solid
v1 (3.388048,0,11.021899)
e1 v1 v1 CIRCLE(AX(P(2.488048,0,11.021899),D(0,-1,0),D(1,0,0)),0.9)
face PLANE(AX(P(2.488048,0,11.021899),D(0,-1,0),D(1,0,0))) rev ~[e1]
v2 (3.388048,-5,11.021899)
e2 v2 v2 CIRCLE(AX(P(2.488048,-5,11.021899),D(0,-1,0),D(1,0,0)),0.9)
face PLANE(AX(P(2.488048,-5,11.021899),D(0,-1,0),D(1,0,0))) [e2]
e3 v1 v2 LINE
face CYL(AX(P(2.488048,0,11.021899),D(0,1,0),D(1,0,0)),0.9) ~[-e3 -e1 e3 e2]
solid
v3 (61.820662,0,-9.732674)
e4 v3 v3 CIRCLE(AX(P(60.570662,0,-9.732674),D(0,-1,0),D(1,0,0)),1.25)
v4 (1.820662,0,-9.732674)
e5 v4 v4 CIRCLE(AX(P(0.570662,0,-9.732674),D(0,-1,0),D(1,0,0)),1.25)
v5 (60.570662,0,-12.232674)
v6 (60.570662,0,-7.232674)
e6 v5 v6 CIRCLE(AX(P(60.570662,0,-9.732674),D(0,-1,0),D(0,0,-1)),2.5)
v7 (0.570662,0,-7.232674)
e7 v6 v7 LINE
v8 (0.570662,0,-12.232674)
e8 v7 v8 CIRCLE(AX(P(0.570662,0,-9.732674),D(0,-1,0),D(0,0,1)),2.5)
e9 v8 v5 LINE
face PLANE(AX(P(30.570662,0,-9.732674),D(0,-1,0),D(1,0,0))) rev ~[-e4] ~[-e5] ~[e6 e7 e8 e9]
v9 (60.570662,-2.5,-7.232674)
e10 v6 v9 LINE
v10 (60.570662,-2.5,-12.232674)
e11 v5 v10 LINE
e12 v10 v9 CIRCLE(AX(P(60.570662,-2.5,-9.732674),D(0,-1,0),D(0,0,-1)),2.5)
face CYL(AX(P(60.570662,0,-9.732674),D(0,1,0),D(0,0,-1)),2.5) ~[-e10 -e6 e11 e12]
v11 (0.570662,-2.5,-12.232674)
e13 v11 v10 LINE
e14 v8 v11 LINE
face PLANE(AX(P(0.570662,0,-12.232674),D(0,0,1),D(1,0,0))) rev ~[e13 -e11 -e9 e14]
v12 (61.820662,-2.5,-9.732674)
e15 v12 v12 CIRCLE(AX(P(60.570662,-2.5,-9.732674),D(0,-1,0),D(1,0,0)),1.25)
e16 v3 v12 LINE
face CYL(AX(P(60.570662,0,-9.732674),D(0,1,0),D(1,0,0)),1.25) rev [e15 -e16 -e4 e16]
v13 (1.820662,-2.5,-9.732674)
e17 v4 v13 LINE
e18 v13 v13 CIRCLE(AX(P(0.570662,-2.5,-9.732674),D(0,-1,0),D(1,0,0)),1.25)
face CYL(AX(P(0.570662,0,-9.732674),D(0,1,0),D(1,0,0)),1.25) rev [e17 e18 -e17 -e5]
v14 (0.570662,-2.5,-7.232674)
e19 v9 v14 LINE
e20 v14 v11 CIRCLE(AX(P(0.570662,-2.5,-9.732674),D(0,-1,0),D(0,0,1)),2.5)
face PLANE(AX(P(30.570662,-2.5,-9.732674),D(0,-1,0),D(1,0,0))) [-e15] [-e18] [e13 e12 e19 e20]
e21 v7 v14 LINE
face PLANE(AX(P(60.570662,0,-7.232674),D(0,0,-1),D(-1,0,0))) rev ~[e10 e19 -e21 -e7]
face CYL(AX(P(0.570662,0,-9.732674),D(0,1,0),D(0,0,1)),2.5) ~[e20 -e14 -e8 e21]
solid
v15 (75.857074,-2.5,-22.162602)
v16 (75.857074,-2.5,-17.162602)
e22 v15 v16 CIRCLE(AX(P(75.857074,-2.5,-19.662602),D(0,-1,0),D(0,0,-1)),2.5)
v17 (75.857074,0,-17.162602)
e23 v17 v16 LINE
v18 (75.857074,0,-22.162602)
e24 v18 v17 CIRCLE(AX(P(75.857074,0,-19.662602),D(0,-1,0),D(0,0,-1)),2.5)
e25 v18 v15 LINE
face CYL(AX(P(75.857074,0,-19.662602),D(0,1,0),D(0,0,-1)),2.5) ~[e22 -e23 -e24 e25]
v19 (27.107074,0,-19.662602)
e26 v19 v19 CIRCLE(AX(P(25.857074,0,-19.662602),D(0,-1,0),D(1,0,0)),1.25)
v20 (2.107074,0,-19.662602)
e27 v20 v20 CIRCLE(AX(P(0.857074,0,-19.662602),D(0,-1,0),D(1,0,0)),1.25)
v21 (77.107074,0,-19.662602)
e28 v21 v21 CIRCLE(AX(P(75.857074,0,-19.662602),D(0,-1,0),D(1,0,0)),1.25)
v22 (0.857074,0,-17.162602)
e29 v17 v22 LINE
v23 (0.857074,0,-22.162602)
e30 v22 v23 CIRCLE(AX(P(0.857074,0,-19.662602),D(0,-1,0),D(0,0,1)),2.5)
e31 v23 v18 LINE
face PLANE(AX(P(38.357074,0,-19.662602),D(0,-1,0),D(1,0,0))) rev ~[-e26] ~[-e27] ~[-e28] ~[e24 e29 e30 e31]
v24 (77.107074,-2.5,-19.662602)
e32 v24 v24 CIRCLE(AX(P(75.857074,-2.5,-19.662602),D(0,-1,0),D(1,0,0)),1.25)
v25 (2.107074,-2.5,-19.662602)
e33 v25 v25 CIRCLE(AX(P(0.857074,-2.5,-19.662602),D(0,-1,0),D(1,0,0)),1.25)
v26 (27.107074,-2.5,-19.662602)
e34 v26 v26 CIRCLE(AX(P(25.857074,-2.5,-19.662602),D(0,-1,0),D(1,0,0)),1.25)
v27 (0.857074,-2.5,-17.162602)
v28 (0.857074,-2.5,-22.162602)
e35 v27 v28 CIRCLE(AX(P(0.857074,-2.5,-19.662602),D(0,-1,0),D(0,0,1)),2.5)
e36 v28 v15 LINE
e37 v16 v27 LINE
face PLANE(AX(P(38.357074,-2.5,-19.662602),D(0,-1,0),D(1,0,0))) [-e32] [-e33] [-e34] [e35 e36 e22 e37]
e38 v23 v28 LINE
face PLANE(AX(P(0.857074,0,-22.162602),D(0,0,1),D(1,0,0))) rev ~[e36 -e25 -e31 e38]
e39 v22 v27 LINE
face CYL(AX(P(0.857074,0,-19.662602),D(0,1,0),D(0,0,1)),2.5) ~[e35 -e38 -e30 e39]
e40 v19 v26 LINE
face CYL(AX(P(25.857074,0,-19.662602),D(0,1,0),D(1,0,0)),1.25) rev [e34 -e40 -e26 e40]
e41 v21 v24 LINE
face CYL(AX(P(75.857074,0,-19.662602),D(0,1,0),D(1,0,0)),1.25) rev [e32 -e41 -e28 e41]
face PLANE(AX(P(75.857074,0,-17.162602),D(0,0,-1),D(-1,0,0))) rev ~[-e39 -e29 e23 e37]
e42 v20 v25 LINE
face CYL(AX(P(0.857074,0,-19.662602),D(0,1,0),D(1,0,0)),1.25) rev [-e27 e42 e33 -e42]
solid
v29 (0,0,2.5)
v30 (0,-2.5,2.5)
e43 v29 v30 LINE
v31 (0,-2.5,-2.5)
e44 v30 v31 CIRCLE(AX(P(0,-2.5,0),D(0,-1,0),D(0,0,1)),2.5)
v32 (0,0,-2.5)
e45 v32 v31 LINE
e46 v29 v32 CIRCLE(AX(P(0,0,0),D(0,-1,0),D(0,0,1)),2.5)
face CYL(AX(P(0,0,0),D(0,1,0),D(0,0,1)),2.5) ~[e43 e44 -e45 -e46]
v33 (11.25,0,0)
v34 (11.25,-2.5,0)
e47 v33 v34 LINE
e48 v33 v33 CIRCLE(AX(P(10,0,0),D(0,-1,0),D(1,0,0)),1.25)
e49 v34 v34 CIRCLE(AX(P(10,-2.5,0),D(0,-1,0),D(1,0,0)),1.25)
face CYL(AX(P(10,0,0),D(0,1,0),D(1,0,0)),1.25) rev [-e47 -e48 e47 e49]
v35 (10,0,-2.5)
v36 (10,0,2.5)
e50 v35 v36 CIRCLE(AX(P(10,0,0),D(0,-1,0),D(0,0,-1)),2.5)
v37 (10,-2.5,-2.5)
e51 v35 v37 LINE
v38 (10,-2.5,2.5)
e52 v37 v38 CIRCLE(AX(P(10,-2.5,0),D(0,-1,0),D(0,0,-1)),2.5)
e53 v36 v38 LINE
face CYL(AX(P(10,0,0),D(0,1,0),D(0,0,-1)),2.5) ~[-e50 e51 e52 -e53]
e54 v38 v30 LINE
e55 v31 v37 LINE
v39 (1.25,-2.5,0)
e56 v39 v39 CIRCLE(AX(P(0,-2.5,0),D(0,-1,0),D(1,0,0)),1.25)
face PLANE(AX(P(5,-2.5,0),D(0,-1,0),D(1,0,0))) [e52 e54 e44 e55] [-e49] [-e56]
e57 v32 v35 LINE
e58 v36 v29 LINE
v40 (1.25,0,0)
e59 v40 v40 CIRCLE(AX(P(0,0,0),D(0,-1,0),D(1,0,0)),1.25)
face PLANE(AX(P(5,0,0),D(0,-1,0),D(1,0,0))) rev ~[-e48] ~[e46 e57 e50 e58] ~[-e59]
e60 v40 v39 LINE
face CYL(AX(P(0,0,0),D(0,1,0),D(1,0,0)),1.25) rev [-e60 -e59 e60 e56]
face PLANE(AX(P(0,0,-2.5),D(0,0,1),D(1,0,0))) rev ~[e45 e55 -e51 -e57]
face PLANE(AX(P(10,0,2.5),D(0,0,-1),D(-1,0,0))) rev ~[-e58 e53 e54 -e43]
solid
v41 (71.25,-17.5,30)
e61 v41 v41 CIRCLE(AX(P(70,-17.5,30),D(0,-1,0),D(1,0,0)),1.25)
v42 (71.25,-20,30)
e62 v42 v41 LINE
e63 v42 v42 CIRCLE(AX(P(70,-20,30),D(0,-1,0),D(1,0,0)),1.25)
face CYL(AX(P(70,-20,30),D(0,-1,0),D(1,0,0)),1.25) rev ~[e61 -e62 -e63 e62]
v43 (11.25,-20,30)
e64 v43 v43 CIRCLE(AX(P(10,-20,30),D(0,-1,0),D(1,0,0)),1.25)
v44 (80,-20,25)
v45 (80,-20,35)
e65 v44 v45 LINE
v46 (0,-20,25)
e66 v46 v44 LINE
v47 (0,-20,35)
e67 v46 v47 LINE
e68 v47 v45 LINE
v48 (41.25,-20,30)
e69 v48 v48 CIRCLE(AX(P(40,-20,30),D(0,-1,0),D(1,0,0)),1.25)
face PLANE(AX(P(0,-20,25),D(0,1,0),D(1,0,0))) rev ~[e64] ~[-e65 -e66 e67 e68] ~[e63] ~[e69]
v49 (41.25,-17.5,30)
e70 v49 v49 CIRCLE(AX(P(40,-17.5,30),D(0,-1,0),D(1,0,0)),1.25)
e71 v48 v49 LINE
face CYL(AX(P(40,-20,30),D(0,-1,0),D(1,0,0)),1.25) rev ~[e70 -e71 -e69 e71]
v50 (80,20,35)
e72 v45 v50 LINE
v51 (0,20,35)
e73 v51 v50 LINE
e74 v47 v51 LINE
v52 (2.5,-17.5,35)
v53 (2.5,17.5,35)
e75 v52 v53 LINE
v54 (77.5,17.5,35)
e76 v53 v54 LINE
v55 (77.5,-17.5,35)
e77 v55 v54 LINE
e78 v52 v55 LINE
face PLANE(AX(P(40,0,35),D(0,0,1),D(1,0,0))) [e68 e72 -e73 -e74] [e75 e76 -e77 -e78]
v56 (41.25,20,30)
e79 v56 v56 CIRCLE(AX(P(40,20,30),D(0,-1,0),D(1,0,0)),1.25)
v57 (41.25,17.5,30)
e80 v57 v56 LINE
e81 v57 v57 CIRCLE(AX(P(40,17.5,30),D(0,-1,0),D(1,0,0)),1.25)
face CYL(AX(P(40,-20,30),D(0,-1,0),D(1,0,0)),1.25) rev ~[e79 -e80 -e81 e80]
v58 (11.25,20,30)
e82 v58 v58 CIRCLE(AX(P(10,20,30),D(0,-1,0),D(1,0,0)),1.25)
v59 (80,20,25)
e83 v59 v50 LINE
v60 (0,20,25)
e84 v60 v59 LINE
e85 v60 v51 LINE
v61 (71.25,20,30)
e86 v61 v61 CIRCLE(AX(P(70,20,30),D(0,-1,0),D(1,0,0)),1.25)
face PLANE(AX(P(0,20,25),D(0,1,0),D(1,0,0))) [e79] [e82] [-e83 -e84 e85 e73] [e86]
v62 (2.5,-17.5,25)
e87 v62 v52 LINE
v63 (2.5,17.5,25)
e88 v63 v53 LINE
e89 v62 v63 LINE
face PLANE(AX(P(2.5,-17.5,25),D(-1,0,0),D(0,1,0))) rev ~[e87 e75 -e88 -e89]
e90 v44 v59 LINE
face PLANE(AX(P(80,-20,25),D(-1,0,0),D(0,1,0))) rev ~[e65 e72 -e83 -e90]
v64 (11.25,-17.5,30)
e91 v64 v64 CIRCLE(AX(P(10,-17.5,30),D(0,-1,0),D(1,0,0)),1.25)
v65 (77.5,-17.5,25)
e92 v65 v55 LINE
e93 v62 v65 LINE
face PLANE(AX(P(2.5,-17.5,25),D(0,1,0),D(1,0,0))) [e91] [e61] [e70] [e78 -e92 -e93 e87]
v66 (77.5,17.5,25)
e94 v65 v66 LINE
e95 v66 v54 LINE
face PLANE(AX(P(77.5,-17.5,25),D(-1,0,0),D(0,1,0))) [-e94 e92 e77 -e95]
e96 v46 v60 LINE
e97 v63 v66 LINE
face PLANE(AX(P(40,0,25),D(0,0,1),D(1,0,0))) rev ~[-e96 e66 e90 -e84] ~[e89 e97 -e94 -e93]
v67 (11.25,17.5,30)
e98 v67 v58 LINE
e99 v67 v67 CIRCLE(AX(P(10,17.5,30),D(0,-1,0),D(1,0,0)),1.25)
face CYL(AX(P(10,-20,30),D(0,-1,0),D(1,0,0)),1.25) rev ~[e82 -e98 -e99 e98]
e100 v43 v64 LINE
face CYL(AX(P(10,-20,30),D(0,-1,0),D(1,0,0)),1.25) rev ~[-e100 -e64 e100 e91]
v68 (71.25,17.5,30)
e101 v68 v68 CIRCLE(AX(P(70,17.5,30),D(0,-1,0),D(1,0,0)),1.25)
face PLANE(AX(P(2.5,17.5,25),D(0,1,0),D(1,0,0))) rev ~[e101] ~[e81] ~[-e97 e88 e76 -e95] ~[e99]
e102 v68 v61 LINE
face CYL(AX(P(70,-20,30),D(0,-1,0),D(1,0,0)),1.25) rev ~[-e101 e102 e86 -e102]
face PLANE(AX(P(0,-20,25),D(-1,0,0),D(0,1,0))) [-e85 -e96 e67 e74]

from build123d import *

# Parameters (mm, degrees)
F1_R      = 1.25
F2_DEPTH  = 2.5
F3_R      = 1.25
F4_DEPTH  = 2.5
F5_R      = 1.25
F6_DEPTH  = 2.5
F8_W      = 80
F8_H      = 40
F8_W_2    = 75
F8_H_2    = 35
F9_DEPTH  = 10
F10_R     = 1.25
F11_DEPTH = 40.001
F12_R     = 0.9
F13_DEPTH = 5


with BuildPart() as f2:
    # F1 (on Front) → F2 (new body)
    with BuildSketch(Plane.XZ):
        with BuildLine():
            Line((10, 2.5), (0, 2.5))
            ThreePointArc((0, 2.5), (-2.5, 0), (0, -2.5))
            Line((0, -2.5), (10, -2.5))
            ThreePointArc((10, -2.5), (12.5, 0), (10, 2.5))
        make_face()
        Circle(F1_R, mode=Mode.SUBTRACT)
        with Locations((10, 0)):
            Circle(F1_R, mode=Mode.SUBTRACT)
    extrude(amount=F2_DEPTH)


with BuildPart() as f4:
    # F3 (on Front) → F4 (new body)
    with BuildSketch(Plane.XZ):
        with BuildLine():
            Line((60.5706622079, -7.232673876), (0.5706622079, -7.232673876))
            ThreePointArc((0.5706622079, -7.232673876), (-1.9293377921, -9.732673876), (0.5706622079, -12.232673876))
            Line((0.5706622079, -12.232673876), (60.5706622079, -12.232673876))
            ThreePointArc((60.5706622079, -12.232673876), (63.0706622079, -9.732673876), (60.5706622079, -7.232673876))
        make_face()
        with Locations((0.5706622079, -9.732673876)):
            Circle(F3_R, mode=Mode.SUBTRACT)
        with Locations((60.5706622079, -9.732673876)):
            Circle(F3_R, mode=Mode.SUBTRACT)
    extrude(amount=F4_DEPTH)


with BuildPart() as f6:
    # F5 (on Front) → F6 (new body)
    with BuildSketch(Plane.XZ):
        with BuildLine():
            Line((75.8570737601, -17.1626018733), (0.8570737601, -17.1626018733))
            ThreePointArc((0.8570737601, -17.1626018733), (-1.6429262399, -19.6626018733), (0.8570737601, -22.1626018733))
            Line((0.8570737601, -22.1626018733), (75.8570737601, -22.1626018733))
            ThreePointArc((75.8570737601, -22.1626018733), (78.3570737601, -19.6626018733), (75.8570737601, -17.1626018733))
        make_face()
        with Locations((0.8570737601, -19.6626018733)):
            Circle(F5_R, mode=Mode.SUBTRACT)
        with Locations((25.8570737601, -19.6626018733)):
            Circle(F5_R, mode=Mode.SUBTRACT)
        with Locations((75.8570737601, -19.6626018733)):
            Circle(F5_R, mode=Mode.SUBTRACT)
    extrude(amount=F6_DEPTH)


with BuildPart() as f9:
    # F8 (on offset) → F9 (new body)
    with BuildSketch(Plane.XY.offset(25)):
        with Locations((40, 0)):
            Rectangle(F8_W, F8_H)
        with Locations((40, 0)):
            Rectangle(F8_W_2, F8_H_2, mode=Mode.SUBTRACT)
    extrude(amount=F9_DEPTH)

    # F10 (on face) → F11 (cut, through all)
    with BuildSketch(Plane.XZ.offset(20)):
        with Locations((10, 30)):
            Circle(F10_R)
        with Locations((70, 30)):
            Circle(F10_R)
        with Locations((40, 30)):
            Circle(F10_R)
    extrude(amount=-F11_DEPTH, mode=Mode.SUBTRACT)


with BuildPart() as f13:
    # F12 (on Front) → F13 (new body)
    with BuildSketch(Plane.XZ):
        with Locations((2.488047583, 11.0218990594)):
            Circle(F12_R)
    extrude(amount=F13_DEPTH)


solid = Compound([f2.part, f4.part, f6.part, f9.part, f13.part])
